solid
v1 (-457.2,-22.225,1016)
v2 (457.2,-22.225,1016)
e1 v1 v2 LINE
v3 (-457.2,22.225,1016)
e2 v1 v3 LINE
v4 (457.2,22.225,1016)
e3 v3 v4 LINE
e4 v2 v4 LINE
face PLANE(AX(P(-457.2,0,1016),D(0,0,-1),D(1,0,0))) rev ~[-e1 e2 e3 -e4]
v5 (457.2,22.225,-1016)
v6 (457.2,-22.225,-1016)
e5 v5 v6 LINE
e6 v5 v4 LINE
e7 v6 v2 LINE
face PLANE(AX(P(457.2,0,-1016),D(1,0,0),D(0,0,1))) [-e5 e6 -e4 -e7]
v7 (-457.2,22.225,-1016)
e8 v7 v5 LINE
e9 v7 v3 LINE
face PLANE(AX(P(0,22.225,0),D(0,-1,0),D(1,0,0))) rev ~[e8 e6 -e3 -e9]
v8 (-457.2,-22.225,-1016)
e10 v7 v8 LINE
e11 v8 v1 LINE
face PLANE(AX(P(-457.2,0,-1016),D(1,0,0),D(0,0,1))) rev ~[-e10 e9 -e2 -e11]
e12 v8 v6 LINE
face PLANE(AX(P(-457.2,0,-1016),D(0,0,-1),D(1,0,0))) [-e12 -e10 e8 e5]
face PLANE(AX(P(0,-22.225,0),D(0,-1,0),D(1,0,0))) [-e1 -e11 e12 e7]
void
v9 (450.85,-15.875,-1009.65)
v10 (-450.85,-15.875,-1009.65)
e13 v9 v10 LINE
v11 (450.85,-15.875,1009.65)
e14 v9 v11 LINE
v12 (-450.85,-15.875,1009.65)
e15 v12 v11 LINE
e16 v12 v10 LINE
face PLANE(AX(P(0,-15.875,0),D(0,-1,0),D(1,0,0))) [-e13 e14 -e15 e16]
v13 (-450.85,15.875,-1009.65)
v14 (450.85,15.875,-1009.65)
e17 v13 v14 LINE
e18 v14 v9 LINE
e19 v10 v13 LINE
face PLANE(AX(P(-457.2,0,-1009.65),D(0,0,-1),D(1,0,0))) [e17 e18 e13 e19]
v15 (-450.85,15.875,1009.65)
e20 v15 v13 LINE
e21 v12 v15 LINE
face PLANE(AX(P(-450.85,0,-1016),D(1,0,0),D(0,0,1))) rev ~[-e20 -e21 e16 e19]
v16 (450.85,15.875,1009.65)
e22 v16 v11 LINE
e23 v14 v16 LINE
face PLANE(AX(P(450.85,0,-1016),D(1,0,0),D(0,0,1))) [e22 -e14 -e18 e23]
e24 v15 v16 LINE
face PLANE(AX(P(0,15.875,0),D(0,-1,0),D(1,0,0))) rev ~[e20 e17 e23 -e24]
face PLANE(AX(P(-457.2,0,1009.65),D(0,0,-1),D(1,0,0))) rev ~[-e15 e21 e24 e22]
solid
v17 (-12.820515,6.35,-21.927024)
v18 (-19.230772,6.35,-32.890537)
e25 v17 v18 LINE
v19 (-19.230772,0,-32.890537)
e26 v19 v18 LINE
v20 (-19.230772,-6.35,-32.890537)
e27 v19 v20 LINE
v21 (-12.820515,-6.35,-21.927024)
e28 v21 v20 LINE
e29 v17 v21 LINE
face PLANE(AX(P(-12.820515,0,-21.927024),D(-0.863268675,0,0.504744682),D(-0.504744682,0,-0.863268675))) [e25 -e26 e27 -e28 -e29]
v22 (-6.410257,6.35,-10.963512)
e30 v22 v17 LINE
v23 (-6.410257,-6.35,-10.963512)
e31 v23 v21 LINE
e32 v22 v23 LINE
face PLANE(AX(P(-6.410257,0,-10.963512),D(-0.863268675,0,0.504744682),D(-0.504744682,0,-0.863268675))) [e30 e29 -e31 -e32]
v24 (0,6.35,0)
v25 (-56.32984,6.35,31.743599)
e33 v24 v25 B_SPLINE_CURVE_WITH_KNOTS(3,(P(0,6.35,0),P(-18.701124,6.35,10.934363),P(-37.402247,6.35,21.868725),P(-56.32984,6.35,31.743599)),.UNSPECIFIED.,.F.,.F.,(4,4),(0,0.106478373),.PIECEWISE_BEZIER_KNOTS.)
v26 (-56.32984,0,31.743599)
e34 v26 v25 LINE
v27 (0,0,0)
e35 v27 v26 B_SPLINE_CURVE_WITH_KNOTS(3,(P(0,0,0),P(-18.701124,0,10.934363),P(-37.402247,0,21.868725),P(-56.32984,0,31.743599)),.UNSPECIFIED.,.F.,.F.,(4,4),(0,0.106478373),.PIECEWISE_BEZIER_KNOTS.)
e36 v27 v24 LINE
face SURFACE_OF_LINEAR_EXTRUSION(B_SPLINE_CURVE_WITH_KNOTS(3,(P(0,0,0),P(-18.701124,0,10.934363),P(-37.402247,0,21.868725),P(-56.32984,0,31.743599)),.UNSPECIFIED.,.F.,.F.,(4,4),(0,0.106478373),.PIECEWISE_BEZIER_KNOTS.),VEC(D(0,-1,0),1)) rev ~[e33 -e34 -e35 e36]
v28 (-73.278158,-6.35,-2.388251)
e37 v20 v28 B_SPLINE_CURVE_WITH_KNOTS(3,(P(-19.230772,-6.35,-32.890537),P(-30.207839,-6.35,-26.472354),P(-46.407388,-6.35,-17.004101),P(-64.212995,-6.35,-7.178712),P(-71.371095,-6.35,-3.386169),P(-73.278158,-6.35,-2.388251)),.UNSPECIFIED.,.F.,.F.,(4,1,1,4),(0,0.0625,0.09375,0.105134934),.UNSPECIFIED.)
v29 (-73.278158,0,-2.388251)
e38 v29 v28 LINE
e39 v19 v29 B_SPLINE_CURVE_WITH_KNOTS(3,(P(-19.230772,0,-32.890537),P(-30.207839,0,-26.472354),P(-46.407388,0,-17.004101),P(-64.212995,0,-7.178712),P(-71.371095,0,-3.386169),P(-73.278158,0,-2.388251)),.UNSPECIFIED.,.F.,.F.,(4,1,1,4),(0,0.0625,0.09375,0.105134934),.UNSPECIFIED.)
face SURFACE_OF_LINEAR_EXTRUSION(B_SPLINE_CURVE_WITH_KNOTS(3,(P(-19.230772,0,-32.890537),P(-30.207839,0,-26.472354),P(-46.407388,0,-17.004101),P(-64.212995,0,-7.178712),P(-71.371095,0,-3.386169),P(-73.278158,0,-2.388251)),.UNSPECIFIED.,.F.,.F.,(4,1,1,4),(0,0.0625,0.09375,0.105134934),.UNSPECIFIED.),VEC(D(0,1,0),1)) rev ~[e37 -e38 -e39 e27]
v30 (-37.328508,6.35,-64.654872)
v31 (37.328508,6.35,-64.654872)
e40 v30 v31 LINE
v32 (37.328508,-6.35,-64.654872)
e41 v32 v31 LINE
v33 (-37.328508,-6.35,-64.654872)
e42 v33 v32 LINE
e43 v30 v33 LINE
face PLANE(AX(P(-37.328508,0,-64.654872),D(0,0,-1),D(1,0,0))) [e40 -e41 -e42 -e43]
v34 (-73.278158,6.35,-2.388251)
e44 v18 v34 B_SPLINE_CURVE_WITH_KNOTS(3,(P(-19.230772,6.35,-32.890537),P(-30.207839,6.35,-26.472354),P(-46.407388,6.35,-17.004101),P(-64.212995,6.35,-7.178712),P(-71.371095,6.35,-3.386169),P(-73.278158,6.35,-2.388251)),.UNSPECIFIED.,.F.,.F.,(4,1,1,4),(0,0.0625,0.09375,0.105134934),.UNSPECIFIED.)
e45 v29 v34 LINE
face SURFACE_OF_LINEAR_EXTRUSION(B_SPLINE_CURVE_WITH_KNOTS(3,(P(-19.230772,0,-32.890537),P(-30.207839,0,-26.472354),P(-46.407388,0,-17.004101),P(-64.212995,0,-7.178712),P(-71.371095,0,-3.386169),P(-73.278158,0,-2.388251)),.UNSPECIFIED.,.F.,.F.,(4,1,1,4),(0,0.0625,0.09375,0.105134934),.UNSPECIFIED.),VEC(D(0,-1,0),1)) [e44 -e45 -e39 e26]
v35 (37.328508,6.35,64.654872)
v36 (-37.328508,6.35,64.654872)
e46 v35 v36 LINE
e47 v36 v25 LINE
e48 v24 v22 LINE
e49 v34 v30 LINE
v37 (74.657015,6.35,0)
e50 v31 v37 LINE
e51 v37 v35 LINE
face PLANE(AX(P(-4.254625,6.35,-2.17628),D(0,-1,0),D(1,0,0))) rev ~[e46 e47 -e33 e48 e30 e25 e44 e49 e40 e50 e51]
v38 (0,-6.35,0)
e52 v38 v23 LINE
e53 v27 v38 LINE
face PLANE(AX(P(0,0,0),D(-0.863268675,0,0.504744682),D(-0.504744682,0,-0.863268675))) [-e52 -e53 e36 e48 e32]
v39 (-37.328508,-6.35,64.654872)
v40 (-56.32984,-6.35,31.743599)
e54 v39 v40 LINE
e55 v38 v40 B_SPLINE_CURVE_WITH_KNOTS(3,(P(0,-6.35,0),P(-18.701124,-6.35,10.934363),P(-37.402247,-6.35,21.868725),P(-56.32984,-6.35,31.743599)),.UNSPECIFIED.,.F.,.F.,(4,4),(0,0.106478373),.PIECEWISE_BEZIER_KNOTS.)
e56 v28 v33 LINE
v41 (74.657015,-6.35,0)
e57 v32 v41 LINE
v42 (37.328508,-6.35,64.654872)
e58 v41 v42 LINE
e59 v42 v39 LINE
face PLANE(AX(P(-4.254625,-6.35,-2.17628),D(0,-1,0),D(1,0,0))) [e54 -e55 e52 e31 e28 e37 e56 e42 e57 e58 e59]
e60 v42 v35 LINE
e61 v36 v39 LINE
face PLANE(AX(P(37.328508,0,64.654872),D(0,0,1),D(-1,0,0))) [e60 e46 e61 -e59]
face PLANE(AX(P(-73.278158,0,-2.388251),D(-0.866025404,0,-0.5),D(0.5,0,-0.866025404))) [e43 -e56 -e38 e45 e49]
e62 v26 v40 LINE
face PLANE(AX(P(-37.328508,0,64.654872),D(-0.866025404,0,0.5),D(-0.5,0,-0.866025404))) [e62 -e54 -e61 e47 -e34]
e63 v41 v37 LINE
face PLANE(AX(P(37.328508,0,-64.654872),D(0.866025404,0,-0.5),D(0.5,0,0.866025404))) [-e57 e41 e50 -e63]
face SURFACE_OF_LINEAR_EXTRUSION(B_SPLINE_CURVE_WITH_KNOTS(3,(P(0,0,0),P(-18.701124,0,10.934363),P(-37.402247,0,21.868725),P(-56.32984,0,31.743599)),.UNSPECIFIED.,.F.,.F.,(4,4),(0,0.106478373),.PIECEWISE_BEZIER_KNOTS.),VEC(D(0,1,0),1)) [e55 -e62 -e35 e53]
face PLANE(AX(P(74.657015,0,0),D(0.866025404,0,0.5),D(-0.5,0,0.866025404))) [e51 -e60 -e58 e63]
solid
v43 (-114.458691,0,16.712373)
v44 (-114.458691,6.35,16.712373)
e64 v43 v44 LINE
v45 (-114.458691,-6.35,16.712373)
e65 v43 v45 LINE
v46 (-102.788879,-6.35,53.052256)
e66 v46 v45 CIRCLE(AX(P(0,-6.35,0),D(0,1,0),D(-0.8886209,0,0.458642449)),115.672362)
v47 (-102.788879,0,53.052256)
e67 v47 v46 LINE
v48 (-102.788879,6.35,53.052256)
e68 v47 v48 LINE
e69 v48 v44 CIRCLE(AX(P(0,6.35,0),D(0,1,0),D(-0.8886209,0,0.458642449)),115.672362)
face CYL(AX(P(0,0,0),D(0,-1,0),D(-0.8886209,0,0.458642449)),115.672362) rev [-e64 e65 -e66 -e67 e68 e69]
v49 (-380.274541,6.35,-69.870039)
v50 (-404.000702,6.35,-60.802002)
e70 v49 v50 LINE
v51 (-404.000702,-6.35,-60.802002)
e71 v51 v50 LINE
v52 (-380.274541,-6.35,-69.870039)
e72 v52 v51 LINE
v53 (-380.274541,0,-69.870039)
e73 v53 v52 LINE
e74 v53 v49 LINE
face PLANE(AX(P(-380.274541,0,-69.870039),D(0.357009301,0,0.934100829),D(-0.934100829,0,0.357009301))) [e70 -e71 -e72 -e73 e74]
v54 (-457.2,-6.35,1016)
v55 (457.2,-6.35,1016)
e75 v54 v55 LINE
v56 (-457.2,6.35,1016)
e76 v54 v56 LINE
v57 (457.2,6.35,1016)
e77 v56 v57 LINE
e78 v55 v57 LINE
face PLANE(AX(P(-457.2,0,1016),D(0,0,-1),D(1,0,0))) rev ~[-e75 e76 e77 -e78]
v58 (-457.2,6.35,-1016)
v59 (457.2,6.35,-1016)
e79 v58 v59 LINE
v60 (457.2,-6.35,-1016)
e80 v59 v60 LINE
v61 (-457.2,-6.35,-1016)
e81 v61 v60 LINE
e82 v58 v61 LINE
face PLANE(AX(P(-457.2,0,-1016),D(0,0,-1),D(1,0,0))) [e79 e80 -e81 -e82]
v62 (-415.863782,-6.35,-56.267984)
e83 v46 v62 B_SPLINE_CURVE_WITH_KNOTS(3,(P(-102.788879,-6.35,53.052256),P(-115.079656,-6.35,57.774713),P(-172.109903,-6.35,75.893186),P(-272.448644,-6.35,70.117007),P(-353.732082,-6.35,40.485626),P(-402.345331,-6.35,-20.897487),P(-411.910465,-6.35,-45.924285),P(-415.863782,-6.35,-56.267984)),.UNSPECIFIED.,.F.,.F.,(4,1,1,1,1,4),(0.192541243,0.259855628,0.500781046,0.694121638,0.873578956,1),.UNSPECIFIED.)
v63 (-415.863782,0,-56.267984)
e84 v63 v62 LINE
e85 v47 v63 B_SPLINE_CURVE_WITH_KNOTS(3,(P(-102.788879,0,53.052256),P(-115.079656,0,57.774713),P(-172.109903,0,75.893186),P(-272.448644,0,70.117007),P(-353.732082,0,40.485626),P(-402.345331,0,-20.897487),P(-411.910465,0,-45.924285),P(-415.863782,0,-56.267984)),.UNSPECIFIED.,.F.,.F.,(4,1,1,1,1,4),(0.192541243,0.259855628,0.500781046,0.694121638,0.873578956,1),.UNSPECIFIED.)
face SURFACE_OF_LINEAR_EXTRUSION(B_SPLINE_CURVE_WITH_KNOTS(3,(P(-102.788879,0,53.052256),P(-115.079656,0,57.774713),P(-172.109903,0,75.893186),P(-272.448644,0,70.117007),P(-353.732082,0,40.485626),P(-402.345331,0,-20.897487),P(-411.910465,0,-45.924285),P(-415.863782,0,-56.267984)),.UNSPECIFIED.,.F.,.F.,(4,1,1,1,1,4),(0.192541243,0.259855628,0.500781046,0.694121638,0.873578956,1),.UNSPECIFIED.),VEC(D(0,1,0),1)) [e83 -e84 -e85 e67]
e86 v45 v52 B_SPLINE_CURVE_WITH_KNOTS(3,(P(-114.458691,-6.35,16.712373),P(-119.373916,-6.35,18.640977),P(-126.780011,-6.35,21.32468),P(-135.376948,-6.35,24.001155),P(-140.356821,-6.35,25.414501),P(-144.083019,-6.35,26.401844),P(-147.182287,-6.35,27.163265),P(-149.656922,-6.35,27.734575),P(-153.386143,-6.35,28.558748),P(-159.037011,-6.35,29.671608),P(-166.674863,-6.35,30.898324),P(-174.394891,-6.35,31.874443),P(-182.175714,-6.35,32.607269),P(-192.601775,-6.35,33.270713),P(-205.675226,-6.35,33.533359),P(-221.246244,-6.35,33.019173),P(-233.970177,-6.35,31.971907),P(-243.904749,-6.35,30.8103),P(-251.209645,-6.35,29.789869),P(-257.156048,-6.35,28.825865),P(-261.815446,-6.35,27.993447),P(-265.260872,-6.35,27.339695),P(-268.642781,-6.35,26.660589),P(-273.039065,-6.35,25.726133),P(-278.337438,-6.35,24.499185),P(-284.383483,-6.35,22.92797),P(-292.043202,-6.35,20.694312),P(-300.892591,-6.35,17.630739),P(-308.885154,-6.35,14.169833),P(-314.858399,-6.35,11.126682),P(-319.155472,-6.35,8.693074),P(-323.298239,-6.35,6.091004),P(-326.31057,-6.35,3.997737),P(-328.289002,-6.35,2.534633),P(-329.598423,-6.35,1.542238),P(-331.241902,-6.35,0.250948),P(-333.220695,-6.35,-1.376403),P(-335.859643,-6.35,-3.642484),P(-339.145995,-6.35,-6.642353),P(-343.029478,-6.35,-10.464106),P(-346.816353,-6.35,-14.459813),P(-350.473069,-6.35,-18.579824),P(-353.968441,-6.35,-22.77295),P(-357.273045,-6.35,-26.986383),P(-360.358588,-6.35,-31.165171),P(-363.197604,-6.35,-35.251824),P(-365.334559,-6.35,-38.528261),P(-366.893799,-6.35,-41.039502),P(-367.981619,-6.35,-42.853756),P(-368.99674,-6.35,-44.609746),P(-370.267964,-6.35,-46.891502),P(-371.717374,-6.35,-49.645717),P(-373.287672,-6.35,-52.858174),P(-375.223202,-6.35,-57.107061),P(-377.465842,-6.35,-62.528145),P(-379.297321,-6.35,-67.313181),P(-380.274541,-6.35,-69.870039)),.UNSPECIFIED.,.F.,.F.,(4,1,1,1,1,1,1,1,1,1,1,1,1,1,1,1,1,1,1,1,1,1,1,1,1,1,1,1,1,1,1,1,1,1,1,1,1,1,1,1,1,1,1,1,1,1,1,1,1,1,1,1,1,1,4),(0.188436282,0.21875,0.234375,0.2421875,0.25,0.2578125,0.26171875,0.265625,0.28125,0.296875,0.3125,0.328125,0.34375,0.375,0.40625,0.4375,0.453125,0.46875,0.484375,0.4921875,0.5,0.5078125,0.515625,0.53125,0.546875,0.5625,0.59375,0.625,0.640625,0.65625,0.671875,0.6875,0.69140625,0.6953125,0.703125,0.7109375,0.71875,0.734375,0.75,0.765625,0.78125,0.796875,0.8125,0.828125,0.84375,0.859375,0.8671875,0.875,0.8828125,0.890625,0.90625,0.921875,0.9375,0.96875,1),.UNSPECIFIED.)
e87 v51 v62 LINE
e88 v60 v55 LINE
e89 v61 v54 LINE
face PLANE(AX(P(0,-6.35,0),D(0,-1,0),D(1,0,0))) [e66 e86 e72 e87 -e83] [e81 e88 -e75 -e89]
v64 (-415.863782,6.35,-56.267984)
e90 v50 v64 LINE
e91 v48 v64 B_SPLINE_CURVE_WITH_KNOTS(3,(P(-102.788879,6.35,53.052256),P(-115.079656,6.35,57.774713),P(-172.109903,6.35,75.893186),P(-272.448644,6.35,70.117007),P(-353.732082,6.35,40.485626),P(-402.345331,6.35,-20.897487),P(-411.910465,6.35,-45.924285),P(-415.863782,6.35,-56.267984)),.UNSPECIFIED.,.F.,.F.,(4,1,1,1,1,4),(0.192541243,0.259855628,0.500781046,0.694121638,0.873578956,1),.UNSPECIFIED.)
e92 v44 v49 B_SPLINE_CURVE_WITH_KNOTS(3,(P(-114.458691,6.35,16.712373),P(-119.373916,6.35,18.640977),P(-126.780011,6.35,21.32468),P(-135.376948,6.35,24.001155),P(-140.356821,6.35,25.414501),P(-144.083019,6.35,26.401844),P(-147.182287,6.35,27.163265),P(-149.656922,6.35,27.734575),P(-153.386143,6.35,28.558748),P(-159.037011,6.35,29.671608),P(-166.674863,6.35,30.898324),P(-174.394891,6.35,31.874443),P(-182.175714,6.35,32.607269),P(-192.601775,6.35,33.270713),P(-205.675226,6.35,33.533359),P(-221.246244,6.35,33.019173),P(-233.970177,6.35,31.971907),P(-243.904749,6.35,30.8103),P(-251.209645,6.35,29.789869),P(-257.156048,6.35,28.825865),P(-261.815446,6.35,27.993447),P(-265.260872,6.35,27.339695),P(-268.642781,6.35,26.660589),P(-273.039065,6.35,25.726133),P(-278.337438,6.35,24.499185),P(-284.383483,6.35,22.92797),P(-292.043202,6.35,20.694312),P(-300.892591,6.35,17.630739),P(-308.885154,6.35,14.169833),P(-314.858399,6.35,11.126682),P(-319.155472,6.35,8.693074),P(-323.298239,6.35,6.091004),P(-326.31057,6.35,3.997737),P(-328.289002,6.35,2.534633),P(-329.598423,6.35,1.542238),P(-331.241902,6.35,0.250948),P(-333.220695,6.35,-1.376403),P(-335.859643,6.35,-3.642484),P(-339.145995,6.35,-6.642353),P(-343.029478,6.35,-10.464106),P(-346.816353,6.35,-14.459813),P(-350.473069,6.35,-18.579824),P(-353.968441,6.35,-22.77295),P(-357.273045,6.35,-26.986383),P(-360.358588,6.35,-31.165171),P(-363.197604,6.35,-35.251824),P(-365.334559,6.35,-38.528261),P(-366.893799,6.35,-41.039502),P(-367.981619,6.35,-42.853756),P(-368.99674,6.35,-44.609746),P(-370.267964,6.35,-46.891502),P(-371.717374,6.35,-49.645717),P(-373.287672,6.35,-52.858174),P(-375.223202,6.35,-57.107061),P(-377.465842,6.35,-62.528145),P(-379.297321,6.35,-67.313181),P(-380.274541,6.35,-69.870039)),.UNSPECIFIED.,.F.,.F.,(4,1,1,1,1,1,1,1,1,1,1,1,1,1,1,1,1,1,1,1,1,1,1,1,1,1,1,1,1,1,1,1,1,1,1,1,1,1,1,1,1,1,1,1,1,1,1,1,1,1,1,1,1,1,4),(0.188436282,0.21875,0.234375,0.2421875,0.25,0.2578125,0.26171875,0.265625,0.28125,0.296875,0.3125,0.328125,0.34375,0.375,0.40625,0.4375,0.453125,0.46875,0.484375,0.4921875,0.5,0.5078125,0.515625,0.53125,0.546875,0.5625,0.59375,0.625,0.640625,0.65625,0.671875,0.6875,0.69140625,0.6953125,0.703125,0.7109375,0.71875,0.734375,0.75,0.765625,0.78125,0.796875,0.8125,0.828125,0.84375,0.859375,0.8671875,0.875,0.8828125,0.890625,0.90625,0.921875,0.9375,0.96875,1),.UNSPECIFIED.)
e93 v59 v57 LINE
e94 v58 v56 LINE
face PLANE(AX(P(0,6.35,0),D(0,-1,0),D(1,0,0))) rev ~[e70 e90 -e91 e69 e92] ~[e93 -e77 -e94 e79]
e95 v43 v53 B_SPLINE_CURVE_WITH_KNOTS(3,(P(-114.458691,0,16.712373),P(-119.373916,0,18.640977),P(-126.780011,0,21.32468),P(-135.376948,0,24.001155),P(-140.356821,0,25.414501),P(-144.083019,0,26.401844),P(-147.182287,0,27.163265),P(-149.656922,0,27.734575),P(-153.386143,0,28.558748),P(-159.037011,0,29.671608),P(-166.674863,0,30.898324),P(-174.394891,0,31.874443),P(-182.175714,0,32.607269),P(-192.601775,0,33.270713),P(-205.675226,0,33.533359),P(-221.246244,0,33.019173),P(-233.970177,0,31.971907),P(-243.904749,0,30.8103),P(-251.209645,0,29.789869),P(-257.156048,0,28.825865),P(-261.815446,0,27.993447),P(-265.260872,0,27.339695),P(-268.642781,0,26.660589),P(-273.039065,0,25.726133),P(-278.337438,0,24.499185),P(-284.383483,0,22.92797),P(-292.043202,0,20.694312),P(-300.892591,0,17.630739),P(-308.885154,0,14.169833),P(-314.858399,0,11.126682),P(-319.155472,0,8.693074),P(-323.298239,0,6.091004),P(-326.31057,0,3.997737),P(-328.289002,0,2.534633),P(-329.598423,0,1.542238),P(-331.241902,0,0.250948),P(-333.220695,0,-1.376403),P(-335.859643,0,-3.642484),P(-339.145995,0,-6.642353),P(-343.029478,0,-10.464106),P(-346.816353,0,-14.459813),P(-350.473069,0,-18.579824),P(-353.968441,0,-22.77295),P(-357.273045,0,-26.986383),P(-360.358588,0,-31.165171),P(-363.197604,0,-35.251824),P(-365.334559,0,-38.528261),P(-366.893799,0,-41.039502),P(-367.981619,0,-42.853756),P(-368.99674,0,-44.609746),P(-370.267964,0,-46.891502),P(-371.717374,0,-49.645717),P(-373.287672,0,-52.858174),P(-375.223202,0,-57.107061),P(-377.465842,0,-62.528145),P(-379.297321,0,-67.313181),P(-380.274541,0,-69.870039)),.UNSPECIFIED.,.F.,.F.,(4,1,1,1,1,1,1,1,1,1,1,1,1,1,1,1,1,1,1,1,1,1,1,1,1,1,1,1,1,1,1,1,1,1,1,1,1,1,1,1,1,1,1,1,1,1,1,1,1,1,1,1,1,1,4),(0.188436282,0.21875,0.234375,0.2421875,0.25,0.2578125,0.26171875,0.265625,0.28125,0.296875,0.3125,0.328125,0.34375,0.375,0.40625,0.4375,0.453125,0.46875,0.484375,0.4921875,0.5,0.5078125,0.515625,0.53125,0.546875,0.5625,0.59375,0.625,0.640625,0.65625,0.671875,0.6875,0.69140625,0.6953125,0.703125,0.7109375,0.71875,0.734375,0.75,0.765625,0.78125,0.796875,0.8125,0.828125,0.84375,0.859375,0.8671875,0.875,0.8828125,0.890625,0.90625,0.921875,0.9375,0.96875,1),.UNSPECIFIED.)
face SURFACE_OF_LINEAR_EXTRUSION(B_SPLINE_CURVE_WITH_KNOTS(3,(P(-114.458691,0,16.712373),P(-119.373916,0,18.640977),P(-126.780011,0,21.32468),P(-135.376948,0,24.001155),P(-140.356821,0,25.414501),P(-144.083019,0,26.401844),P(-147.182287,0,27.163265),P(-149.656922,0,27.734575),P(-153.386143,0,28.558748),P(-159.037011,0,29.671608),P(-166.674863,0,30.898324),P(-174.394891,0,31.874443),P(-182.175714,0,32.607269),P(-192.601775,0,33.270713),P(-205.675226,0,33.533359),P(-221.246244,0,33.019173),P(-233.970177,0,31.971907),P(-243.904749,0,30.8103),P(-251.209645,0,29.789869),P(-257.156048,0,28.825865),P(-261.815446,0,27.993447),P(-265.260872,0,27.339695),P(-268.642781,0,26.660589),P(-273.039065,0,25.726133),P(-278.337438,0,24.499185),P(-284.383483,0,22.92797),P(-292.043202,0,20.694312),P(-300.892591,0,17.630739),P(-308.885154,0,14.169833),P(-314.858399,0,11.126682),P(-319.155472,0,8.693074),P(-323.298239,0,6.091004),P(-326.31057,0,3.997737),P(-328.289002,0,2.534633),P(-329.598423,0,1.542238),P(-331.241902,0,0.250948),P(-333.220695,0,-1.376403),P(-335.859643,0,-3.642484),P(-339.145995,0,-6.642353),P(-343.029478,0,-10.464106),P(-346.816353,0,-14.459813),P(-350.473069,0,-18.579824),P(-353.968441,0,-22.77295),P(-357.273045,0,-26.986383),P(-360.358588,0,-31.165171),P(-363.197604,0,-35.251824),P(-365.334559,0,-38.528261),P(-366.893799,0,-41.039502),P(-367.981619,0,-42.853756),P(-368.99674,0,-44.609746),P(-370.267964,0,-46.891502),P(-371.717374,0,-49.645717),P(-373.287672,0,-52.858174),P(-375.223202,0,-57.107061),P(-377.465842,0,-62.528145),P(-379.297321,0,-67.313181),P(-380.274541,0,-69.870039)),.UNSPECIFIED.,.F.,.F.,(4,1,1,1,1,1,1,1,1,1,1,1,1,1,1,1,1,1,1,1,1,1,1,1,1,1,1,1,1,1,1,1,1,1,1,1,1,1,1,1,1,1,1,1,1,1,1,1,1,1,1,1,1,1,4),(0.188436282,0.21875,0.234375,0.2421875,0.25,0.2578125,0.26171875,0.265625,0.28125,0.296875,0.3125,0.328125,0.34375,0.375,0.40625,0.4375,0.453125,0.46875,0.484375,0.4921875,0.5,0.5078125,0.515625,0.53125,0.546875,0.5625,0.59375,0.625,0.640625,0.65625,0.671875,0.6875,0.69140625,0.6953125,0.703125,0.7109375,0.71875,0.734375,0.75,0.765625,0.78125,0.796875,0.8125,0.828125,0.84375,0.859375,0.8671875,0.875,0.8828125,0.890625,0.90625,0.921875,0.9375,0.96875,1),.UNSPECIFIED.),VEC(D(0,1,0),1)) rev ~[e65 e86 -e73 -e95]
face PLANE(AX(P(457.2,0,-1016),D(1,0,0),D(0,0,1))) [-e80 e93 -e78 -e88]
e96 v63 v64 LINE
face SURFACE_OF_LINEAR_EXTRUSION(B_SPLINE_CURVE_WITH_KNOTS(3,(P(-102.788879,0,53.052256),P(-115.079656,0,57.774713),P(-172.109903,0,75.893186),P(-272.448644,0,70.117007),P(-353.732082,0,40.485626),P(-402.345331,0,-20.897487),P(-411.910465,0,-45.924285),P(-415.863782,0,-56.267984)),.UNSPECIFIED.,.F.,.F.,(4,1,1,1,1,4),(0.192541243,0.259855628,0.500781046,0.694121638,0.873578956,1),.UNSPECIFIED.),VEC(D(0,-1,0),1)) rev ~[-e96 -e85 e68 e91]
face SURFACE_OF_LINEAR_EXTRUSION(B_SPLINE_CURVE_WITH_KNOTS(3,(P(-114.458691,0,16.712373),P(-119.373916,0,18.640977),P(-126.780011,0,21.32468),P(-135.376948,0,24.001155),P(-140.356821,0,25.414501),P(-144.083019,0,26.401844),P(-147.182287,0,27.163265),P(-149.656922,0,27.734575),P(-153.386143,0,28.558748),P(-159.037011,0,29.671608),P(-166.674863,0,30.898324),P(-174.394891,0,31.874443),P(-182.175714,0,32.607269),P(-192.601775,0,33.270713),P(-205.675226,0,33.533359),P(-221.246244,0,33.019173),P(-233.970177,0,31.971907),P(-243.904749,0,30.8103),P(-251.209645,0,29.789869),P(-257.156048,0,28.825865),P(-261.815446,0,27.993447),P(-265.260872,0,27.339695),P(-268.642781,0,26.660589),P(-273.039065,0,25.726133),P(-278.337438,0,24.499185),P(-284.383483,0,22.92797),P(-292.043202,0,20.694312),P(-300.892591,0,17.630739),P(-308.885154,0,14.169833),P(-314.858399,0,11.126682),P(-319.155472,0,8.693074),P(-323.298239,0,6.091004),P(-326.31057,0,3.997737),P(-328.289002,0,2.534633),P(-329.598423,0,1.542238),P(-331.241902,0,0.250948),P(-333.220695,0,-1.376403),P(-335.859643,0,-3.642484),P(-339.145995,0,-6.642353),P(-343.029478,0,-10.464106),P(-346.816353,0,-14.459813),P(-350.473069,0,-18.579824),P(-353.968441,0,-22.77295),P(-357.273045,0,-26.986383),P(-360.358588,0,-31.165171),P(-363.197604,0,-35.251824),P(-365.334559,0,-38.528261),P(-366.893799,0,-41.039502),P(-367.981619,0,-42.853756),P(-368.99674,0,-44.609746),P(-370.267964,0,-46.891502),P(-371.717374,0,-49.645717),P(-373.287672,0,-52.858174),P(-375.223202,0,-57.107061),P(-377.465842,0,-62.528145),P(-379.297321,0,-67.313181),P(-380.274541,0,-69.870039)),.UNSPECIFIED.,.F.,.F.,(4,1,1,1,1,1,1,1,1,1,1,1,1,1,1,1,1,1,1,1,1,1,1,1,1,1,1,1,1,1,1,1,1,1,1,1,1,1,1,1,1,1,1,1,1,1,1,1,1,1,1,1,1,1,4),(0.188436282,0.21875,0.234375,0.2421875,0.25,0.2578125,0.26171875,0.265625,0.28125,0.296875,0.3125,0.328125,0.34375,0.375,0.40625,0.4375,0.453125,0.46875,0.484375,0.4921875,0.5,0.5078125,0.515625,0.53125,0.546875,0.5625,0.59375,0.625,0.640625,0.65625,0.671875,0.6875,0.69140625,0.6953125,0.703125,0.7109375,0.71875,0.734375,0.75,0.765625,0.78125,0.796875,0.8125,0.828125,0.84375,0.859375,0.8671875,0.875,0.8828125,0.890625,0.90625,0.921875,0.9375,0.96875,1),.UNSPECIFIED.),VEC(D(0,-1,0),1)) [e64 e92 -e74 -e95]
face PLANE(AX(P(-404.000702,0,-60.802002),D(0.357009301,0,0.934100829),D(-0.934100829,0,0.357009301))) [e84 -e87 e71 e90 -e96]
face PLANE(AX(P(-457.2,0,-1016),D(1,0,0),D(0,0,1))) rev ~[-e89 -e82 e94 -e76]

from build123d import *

# Parameters (mm, degrees)
F0_W     = 914.4
F0_H     = 2032
F1_DEPTH = 22.225
F2_T     = -6.35
F3_W     = 914.4
F3_H     = 2032
F4_DEPTH = 6.35


# Not quite as in the source:
# - the dataset's text gives a spline's control points without its knots; the knots are read off the source's solid
# - a feature names something its author has since deleted; it is built from what else it names


with BuildPart() as f1:
    # F0 (on Front) → F1 (new body, symmetric)
    with BuildSketch(Plane.XZ):
        Rectangle(F0_W, F0_H)
    extrude(amount=F1_DEPTH, both=True)

    # F2 (hollow: no face is removed)
    offset(amount=F2_T, mode=Mode.SUBTRACT)


with BuildPart() as f4:
    # F3 (on Front) → F4 (new body, symmetric)
    with BuildSketch(Plane.XZ):
        Rectangle(F3_W, F3_H)
        with BuildLine():
            add(Edge.make_bspline(
                [(-102.788878744, 53.0522555544), (-115.0796561664, 57.7747130109), (-172.109902554, 75.8931860417), (-272.4486443535, 70.1170066616), (-353.7320815536, 40.4856256956), (-402.3453308508, -20.8974867371), (-411.9104648371, -45.9242845247), (-415.8637821674, -56.2679842114)],
                knots=[0.1925412434, 0.1925412434, 0.1925412434, 0.1925412434, 0.2598556278, 0.5007810461, 0.6941216382, 0.8735789556, 1, 1, 1, 1], degree=3))
            ThreePointArc((-102.788878744, 53.0522555544), (27.297096775, 112.4053553907), (115.6723623553, 0))
            ThreePointArc((115.6723623553, 0), (-8.3781922539, -115.368545572), (-114.4586911894, 16.7123733823))
            add(Edge.make_bspline(
                [(-114.4586911894, 16.7123733823), (-119.373915653, 18.6409773824), (-126.780010707, 21.3246804139), (-135.3769480544, 24.0011548026), (-140.3568205391, 25.4145011425), (-144.0830186716, 26.4018437315), (-147.1822873269, 27.1632650826), (-149.6569220432, 27.7345753336), (-153.3861427683, 28.5587482576), (-159.0370105211, 29.6716080851), (-166.6748632527, 30.8983238142), (-174.3948906026, 31.8744426293), (-182.175713824, 32.607269398), (-192.6017748616, 33.2707129632), (-205.6752257784, 33.5333589987), (-221.2462439818, 33.019172763), (-233.9701770212, 31.9719071287), (-243.904748781, 30.8102997522), (-251.2096448082, 29.7898690479), (-257.1560475615, 28.8258650751), (-261.8154455178, 27.9934473686), (-265.2608722389, 27.33969481), (-268.6427806681, 26.6605890428), (-273.039065215, 25.726133421), (-278.3374380434, 24.4991846311), (-284.3834831204, 22.9279699464), (-292.0432019853, 20.6943122087), (-300.8925913227, 17.6307385606), (-308.8851535917, 14.1698326237), (-314.8583988735, 11.1266815586), (-319.1554720592, 8.6930736846), (-323.298239195, 6.0910038781), (-326.3105701104, 3.9977373945), (-328.2890021767, 2.5346327242), (-329.5984230491, 1.5422377588), (-331.2419023871, 0.2509479554), (-333.2206947963, -1.3764025092), (-335.8596426843, -3.6424838525), (-339.1459948656, -6.6423529507), (-343.0294781647, -10.4641063031), (-346.8163532922, -14.459813445), (-350.4730691017, -18.5798240363), (-353.9684413043, -22.7729503539), (-357.273045034, -26.9863828828), (-360.3585883118, -31.1651712353), (-363.1976042652, -35.2518241058), (-365.3345588114, -38.5282614985), (-366.8937992739, -41.039502175), (-367.9816193163, -42.8537563567), (-368.9967401066, -44.6097462535), (-370.267963964, -46.89150151), (-371.7173740536, -49.6457172315), (-373.2876715658, -52.858174126), (-375.2232016159, -57.1070610359), (-377.4658419186, -62.5281453327), (-379.2973206299, -67.3131809286), (-380.2745405787, -69.8700385835)],
                knots=[0.1884362819, 0.1884362819, 0.1884362819, 0.1884362819, 0.21875, 0.234375, 0.2421875, 0.25, 0.2578125, 0.26171875, 0.265625, 0.28125, 0.296875, 0.3125, 0.328125, 0.34375, 0.375, 0.40625, 0.4375, 0.453125, 0.46875, 0.484375, 0.4921875, 0.5, 0.5078125, 0.515625, 0.53125, 0.546875, 0.5625, 0.59375, 0.625, 0.640625, 0.65625, 0.671875, 0.6875, 0.69140625, 0.6953125, 0.703125, 0.7109375, 0.71875, 0.734375, 0.75, 0.765625, 0.78125, 0.796875, 0.8125, 0.828125, 0.84375, 0.859375, 0.8671875, 0.875, 0.8828125, 0.890625, 0.90625, 0.921875, 0.9375, 0.96875, 1, 1, 1, 1], degree=3))
            Line((-380.2745405787, -69.8700385835), (-392.1376211083, -65.3360204595))
            Line((-392.1376211083, -65.3360204595), (-404.0007016379, -60.8020023355))
            Line((-404.0007016379, -60.8020023355), (-415.8637821674, -56.2679842114))
        make_face(mode=Mode.SUBTRACT)
    extrude(amount=F4_DEPTH, both=True)


with BuildPart() as f4b:
    # F3 (on Front) → F4, piece 2 (new body, symmetric)
    with BuildSketch(Plane.XZ):
        with BuildLine():
            Line((37.3285076505, 64.6548718214), (-37.3285076505, 64.6548718214))
            Line((-37.3285076505, 64.6548718214), (-56.3298401221, 31.7435985691))
            add(Edge.make_bspline(
                [(0, 0), (-18.7011235658, 10.9343625548), (-37.4022471317, 21.8687251095), (-56.3298401221, 31.7435985691)],
                knots=[0, 0, 0, 0, 0.1064783731, 0.1064783731, 0.1064783731, 0.1064783731], degree=3))
            Line((0, 0), (-6.4102574675, -10.9635121745))
            Line((-6.4102574675, -10.9635121745), (-12.8205149351, -21.9270243489))
            Line((-12.8205149351, -21.9270243489), (-19.2307724026, -32.8905365234))
            add(Edge.make_bspline(
                [(-19.2307724026, -32.8905365234), (-30.2078392868, -26.4723537507), (-46.4073877333, -17.00410068), (-64.2129954804, -7.1787118869), (-71.3710947537, -3.3861690523), (-73.2781581831, -2.3882505846)],
                knots=[0, 0, 0, 0, 0.0625, 0.09375, 0.1051349345, 0.1051349345, 0.1051349345, 0.1051349345], degree=3))
            Line((-73.2781581831, -2.3882505846), (-37.3285076505, -64.6548718214))
            Line((-37.3285076505, -64.6548718214), (37.3285076505, -64.6548718214))
            Line((37.3285076505, -64.6548718214), (74.657015301, 0))
            Line((74.657015301, 0), (37.3285076505, 64.6548718214))
        make_face()
    extrude(amount=F4_DEPTH, both=True)


solid = Compound([f1.part, f4.part, f4b.part])
